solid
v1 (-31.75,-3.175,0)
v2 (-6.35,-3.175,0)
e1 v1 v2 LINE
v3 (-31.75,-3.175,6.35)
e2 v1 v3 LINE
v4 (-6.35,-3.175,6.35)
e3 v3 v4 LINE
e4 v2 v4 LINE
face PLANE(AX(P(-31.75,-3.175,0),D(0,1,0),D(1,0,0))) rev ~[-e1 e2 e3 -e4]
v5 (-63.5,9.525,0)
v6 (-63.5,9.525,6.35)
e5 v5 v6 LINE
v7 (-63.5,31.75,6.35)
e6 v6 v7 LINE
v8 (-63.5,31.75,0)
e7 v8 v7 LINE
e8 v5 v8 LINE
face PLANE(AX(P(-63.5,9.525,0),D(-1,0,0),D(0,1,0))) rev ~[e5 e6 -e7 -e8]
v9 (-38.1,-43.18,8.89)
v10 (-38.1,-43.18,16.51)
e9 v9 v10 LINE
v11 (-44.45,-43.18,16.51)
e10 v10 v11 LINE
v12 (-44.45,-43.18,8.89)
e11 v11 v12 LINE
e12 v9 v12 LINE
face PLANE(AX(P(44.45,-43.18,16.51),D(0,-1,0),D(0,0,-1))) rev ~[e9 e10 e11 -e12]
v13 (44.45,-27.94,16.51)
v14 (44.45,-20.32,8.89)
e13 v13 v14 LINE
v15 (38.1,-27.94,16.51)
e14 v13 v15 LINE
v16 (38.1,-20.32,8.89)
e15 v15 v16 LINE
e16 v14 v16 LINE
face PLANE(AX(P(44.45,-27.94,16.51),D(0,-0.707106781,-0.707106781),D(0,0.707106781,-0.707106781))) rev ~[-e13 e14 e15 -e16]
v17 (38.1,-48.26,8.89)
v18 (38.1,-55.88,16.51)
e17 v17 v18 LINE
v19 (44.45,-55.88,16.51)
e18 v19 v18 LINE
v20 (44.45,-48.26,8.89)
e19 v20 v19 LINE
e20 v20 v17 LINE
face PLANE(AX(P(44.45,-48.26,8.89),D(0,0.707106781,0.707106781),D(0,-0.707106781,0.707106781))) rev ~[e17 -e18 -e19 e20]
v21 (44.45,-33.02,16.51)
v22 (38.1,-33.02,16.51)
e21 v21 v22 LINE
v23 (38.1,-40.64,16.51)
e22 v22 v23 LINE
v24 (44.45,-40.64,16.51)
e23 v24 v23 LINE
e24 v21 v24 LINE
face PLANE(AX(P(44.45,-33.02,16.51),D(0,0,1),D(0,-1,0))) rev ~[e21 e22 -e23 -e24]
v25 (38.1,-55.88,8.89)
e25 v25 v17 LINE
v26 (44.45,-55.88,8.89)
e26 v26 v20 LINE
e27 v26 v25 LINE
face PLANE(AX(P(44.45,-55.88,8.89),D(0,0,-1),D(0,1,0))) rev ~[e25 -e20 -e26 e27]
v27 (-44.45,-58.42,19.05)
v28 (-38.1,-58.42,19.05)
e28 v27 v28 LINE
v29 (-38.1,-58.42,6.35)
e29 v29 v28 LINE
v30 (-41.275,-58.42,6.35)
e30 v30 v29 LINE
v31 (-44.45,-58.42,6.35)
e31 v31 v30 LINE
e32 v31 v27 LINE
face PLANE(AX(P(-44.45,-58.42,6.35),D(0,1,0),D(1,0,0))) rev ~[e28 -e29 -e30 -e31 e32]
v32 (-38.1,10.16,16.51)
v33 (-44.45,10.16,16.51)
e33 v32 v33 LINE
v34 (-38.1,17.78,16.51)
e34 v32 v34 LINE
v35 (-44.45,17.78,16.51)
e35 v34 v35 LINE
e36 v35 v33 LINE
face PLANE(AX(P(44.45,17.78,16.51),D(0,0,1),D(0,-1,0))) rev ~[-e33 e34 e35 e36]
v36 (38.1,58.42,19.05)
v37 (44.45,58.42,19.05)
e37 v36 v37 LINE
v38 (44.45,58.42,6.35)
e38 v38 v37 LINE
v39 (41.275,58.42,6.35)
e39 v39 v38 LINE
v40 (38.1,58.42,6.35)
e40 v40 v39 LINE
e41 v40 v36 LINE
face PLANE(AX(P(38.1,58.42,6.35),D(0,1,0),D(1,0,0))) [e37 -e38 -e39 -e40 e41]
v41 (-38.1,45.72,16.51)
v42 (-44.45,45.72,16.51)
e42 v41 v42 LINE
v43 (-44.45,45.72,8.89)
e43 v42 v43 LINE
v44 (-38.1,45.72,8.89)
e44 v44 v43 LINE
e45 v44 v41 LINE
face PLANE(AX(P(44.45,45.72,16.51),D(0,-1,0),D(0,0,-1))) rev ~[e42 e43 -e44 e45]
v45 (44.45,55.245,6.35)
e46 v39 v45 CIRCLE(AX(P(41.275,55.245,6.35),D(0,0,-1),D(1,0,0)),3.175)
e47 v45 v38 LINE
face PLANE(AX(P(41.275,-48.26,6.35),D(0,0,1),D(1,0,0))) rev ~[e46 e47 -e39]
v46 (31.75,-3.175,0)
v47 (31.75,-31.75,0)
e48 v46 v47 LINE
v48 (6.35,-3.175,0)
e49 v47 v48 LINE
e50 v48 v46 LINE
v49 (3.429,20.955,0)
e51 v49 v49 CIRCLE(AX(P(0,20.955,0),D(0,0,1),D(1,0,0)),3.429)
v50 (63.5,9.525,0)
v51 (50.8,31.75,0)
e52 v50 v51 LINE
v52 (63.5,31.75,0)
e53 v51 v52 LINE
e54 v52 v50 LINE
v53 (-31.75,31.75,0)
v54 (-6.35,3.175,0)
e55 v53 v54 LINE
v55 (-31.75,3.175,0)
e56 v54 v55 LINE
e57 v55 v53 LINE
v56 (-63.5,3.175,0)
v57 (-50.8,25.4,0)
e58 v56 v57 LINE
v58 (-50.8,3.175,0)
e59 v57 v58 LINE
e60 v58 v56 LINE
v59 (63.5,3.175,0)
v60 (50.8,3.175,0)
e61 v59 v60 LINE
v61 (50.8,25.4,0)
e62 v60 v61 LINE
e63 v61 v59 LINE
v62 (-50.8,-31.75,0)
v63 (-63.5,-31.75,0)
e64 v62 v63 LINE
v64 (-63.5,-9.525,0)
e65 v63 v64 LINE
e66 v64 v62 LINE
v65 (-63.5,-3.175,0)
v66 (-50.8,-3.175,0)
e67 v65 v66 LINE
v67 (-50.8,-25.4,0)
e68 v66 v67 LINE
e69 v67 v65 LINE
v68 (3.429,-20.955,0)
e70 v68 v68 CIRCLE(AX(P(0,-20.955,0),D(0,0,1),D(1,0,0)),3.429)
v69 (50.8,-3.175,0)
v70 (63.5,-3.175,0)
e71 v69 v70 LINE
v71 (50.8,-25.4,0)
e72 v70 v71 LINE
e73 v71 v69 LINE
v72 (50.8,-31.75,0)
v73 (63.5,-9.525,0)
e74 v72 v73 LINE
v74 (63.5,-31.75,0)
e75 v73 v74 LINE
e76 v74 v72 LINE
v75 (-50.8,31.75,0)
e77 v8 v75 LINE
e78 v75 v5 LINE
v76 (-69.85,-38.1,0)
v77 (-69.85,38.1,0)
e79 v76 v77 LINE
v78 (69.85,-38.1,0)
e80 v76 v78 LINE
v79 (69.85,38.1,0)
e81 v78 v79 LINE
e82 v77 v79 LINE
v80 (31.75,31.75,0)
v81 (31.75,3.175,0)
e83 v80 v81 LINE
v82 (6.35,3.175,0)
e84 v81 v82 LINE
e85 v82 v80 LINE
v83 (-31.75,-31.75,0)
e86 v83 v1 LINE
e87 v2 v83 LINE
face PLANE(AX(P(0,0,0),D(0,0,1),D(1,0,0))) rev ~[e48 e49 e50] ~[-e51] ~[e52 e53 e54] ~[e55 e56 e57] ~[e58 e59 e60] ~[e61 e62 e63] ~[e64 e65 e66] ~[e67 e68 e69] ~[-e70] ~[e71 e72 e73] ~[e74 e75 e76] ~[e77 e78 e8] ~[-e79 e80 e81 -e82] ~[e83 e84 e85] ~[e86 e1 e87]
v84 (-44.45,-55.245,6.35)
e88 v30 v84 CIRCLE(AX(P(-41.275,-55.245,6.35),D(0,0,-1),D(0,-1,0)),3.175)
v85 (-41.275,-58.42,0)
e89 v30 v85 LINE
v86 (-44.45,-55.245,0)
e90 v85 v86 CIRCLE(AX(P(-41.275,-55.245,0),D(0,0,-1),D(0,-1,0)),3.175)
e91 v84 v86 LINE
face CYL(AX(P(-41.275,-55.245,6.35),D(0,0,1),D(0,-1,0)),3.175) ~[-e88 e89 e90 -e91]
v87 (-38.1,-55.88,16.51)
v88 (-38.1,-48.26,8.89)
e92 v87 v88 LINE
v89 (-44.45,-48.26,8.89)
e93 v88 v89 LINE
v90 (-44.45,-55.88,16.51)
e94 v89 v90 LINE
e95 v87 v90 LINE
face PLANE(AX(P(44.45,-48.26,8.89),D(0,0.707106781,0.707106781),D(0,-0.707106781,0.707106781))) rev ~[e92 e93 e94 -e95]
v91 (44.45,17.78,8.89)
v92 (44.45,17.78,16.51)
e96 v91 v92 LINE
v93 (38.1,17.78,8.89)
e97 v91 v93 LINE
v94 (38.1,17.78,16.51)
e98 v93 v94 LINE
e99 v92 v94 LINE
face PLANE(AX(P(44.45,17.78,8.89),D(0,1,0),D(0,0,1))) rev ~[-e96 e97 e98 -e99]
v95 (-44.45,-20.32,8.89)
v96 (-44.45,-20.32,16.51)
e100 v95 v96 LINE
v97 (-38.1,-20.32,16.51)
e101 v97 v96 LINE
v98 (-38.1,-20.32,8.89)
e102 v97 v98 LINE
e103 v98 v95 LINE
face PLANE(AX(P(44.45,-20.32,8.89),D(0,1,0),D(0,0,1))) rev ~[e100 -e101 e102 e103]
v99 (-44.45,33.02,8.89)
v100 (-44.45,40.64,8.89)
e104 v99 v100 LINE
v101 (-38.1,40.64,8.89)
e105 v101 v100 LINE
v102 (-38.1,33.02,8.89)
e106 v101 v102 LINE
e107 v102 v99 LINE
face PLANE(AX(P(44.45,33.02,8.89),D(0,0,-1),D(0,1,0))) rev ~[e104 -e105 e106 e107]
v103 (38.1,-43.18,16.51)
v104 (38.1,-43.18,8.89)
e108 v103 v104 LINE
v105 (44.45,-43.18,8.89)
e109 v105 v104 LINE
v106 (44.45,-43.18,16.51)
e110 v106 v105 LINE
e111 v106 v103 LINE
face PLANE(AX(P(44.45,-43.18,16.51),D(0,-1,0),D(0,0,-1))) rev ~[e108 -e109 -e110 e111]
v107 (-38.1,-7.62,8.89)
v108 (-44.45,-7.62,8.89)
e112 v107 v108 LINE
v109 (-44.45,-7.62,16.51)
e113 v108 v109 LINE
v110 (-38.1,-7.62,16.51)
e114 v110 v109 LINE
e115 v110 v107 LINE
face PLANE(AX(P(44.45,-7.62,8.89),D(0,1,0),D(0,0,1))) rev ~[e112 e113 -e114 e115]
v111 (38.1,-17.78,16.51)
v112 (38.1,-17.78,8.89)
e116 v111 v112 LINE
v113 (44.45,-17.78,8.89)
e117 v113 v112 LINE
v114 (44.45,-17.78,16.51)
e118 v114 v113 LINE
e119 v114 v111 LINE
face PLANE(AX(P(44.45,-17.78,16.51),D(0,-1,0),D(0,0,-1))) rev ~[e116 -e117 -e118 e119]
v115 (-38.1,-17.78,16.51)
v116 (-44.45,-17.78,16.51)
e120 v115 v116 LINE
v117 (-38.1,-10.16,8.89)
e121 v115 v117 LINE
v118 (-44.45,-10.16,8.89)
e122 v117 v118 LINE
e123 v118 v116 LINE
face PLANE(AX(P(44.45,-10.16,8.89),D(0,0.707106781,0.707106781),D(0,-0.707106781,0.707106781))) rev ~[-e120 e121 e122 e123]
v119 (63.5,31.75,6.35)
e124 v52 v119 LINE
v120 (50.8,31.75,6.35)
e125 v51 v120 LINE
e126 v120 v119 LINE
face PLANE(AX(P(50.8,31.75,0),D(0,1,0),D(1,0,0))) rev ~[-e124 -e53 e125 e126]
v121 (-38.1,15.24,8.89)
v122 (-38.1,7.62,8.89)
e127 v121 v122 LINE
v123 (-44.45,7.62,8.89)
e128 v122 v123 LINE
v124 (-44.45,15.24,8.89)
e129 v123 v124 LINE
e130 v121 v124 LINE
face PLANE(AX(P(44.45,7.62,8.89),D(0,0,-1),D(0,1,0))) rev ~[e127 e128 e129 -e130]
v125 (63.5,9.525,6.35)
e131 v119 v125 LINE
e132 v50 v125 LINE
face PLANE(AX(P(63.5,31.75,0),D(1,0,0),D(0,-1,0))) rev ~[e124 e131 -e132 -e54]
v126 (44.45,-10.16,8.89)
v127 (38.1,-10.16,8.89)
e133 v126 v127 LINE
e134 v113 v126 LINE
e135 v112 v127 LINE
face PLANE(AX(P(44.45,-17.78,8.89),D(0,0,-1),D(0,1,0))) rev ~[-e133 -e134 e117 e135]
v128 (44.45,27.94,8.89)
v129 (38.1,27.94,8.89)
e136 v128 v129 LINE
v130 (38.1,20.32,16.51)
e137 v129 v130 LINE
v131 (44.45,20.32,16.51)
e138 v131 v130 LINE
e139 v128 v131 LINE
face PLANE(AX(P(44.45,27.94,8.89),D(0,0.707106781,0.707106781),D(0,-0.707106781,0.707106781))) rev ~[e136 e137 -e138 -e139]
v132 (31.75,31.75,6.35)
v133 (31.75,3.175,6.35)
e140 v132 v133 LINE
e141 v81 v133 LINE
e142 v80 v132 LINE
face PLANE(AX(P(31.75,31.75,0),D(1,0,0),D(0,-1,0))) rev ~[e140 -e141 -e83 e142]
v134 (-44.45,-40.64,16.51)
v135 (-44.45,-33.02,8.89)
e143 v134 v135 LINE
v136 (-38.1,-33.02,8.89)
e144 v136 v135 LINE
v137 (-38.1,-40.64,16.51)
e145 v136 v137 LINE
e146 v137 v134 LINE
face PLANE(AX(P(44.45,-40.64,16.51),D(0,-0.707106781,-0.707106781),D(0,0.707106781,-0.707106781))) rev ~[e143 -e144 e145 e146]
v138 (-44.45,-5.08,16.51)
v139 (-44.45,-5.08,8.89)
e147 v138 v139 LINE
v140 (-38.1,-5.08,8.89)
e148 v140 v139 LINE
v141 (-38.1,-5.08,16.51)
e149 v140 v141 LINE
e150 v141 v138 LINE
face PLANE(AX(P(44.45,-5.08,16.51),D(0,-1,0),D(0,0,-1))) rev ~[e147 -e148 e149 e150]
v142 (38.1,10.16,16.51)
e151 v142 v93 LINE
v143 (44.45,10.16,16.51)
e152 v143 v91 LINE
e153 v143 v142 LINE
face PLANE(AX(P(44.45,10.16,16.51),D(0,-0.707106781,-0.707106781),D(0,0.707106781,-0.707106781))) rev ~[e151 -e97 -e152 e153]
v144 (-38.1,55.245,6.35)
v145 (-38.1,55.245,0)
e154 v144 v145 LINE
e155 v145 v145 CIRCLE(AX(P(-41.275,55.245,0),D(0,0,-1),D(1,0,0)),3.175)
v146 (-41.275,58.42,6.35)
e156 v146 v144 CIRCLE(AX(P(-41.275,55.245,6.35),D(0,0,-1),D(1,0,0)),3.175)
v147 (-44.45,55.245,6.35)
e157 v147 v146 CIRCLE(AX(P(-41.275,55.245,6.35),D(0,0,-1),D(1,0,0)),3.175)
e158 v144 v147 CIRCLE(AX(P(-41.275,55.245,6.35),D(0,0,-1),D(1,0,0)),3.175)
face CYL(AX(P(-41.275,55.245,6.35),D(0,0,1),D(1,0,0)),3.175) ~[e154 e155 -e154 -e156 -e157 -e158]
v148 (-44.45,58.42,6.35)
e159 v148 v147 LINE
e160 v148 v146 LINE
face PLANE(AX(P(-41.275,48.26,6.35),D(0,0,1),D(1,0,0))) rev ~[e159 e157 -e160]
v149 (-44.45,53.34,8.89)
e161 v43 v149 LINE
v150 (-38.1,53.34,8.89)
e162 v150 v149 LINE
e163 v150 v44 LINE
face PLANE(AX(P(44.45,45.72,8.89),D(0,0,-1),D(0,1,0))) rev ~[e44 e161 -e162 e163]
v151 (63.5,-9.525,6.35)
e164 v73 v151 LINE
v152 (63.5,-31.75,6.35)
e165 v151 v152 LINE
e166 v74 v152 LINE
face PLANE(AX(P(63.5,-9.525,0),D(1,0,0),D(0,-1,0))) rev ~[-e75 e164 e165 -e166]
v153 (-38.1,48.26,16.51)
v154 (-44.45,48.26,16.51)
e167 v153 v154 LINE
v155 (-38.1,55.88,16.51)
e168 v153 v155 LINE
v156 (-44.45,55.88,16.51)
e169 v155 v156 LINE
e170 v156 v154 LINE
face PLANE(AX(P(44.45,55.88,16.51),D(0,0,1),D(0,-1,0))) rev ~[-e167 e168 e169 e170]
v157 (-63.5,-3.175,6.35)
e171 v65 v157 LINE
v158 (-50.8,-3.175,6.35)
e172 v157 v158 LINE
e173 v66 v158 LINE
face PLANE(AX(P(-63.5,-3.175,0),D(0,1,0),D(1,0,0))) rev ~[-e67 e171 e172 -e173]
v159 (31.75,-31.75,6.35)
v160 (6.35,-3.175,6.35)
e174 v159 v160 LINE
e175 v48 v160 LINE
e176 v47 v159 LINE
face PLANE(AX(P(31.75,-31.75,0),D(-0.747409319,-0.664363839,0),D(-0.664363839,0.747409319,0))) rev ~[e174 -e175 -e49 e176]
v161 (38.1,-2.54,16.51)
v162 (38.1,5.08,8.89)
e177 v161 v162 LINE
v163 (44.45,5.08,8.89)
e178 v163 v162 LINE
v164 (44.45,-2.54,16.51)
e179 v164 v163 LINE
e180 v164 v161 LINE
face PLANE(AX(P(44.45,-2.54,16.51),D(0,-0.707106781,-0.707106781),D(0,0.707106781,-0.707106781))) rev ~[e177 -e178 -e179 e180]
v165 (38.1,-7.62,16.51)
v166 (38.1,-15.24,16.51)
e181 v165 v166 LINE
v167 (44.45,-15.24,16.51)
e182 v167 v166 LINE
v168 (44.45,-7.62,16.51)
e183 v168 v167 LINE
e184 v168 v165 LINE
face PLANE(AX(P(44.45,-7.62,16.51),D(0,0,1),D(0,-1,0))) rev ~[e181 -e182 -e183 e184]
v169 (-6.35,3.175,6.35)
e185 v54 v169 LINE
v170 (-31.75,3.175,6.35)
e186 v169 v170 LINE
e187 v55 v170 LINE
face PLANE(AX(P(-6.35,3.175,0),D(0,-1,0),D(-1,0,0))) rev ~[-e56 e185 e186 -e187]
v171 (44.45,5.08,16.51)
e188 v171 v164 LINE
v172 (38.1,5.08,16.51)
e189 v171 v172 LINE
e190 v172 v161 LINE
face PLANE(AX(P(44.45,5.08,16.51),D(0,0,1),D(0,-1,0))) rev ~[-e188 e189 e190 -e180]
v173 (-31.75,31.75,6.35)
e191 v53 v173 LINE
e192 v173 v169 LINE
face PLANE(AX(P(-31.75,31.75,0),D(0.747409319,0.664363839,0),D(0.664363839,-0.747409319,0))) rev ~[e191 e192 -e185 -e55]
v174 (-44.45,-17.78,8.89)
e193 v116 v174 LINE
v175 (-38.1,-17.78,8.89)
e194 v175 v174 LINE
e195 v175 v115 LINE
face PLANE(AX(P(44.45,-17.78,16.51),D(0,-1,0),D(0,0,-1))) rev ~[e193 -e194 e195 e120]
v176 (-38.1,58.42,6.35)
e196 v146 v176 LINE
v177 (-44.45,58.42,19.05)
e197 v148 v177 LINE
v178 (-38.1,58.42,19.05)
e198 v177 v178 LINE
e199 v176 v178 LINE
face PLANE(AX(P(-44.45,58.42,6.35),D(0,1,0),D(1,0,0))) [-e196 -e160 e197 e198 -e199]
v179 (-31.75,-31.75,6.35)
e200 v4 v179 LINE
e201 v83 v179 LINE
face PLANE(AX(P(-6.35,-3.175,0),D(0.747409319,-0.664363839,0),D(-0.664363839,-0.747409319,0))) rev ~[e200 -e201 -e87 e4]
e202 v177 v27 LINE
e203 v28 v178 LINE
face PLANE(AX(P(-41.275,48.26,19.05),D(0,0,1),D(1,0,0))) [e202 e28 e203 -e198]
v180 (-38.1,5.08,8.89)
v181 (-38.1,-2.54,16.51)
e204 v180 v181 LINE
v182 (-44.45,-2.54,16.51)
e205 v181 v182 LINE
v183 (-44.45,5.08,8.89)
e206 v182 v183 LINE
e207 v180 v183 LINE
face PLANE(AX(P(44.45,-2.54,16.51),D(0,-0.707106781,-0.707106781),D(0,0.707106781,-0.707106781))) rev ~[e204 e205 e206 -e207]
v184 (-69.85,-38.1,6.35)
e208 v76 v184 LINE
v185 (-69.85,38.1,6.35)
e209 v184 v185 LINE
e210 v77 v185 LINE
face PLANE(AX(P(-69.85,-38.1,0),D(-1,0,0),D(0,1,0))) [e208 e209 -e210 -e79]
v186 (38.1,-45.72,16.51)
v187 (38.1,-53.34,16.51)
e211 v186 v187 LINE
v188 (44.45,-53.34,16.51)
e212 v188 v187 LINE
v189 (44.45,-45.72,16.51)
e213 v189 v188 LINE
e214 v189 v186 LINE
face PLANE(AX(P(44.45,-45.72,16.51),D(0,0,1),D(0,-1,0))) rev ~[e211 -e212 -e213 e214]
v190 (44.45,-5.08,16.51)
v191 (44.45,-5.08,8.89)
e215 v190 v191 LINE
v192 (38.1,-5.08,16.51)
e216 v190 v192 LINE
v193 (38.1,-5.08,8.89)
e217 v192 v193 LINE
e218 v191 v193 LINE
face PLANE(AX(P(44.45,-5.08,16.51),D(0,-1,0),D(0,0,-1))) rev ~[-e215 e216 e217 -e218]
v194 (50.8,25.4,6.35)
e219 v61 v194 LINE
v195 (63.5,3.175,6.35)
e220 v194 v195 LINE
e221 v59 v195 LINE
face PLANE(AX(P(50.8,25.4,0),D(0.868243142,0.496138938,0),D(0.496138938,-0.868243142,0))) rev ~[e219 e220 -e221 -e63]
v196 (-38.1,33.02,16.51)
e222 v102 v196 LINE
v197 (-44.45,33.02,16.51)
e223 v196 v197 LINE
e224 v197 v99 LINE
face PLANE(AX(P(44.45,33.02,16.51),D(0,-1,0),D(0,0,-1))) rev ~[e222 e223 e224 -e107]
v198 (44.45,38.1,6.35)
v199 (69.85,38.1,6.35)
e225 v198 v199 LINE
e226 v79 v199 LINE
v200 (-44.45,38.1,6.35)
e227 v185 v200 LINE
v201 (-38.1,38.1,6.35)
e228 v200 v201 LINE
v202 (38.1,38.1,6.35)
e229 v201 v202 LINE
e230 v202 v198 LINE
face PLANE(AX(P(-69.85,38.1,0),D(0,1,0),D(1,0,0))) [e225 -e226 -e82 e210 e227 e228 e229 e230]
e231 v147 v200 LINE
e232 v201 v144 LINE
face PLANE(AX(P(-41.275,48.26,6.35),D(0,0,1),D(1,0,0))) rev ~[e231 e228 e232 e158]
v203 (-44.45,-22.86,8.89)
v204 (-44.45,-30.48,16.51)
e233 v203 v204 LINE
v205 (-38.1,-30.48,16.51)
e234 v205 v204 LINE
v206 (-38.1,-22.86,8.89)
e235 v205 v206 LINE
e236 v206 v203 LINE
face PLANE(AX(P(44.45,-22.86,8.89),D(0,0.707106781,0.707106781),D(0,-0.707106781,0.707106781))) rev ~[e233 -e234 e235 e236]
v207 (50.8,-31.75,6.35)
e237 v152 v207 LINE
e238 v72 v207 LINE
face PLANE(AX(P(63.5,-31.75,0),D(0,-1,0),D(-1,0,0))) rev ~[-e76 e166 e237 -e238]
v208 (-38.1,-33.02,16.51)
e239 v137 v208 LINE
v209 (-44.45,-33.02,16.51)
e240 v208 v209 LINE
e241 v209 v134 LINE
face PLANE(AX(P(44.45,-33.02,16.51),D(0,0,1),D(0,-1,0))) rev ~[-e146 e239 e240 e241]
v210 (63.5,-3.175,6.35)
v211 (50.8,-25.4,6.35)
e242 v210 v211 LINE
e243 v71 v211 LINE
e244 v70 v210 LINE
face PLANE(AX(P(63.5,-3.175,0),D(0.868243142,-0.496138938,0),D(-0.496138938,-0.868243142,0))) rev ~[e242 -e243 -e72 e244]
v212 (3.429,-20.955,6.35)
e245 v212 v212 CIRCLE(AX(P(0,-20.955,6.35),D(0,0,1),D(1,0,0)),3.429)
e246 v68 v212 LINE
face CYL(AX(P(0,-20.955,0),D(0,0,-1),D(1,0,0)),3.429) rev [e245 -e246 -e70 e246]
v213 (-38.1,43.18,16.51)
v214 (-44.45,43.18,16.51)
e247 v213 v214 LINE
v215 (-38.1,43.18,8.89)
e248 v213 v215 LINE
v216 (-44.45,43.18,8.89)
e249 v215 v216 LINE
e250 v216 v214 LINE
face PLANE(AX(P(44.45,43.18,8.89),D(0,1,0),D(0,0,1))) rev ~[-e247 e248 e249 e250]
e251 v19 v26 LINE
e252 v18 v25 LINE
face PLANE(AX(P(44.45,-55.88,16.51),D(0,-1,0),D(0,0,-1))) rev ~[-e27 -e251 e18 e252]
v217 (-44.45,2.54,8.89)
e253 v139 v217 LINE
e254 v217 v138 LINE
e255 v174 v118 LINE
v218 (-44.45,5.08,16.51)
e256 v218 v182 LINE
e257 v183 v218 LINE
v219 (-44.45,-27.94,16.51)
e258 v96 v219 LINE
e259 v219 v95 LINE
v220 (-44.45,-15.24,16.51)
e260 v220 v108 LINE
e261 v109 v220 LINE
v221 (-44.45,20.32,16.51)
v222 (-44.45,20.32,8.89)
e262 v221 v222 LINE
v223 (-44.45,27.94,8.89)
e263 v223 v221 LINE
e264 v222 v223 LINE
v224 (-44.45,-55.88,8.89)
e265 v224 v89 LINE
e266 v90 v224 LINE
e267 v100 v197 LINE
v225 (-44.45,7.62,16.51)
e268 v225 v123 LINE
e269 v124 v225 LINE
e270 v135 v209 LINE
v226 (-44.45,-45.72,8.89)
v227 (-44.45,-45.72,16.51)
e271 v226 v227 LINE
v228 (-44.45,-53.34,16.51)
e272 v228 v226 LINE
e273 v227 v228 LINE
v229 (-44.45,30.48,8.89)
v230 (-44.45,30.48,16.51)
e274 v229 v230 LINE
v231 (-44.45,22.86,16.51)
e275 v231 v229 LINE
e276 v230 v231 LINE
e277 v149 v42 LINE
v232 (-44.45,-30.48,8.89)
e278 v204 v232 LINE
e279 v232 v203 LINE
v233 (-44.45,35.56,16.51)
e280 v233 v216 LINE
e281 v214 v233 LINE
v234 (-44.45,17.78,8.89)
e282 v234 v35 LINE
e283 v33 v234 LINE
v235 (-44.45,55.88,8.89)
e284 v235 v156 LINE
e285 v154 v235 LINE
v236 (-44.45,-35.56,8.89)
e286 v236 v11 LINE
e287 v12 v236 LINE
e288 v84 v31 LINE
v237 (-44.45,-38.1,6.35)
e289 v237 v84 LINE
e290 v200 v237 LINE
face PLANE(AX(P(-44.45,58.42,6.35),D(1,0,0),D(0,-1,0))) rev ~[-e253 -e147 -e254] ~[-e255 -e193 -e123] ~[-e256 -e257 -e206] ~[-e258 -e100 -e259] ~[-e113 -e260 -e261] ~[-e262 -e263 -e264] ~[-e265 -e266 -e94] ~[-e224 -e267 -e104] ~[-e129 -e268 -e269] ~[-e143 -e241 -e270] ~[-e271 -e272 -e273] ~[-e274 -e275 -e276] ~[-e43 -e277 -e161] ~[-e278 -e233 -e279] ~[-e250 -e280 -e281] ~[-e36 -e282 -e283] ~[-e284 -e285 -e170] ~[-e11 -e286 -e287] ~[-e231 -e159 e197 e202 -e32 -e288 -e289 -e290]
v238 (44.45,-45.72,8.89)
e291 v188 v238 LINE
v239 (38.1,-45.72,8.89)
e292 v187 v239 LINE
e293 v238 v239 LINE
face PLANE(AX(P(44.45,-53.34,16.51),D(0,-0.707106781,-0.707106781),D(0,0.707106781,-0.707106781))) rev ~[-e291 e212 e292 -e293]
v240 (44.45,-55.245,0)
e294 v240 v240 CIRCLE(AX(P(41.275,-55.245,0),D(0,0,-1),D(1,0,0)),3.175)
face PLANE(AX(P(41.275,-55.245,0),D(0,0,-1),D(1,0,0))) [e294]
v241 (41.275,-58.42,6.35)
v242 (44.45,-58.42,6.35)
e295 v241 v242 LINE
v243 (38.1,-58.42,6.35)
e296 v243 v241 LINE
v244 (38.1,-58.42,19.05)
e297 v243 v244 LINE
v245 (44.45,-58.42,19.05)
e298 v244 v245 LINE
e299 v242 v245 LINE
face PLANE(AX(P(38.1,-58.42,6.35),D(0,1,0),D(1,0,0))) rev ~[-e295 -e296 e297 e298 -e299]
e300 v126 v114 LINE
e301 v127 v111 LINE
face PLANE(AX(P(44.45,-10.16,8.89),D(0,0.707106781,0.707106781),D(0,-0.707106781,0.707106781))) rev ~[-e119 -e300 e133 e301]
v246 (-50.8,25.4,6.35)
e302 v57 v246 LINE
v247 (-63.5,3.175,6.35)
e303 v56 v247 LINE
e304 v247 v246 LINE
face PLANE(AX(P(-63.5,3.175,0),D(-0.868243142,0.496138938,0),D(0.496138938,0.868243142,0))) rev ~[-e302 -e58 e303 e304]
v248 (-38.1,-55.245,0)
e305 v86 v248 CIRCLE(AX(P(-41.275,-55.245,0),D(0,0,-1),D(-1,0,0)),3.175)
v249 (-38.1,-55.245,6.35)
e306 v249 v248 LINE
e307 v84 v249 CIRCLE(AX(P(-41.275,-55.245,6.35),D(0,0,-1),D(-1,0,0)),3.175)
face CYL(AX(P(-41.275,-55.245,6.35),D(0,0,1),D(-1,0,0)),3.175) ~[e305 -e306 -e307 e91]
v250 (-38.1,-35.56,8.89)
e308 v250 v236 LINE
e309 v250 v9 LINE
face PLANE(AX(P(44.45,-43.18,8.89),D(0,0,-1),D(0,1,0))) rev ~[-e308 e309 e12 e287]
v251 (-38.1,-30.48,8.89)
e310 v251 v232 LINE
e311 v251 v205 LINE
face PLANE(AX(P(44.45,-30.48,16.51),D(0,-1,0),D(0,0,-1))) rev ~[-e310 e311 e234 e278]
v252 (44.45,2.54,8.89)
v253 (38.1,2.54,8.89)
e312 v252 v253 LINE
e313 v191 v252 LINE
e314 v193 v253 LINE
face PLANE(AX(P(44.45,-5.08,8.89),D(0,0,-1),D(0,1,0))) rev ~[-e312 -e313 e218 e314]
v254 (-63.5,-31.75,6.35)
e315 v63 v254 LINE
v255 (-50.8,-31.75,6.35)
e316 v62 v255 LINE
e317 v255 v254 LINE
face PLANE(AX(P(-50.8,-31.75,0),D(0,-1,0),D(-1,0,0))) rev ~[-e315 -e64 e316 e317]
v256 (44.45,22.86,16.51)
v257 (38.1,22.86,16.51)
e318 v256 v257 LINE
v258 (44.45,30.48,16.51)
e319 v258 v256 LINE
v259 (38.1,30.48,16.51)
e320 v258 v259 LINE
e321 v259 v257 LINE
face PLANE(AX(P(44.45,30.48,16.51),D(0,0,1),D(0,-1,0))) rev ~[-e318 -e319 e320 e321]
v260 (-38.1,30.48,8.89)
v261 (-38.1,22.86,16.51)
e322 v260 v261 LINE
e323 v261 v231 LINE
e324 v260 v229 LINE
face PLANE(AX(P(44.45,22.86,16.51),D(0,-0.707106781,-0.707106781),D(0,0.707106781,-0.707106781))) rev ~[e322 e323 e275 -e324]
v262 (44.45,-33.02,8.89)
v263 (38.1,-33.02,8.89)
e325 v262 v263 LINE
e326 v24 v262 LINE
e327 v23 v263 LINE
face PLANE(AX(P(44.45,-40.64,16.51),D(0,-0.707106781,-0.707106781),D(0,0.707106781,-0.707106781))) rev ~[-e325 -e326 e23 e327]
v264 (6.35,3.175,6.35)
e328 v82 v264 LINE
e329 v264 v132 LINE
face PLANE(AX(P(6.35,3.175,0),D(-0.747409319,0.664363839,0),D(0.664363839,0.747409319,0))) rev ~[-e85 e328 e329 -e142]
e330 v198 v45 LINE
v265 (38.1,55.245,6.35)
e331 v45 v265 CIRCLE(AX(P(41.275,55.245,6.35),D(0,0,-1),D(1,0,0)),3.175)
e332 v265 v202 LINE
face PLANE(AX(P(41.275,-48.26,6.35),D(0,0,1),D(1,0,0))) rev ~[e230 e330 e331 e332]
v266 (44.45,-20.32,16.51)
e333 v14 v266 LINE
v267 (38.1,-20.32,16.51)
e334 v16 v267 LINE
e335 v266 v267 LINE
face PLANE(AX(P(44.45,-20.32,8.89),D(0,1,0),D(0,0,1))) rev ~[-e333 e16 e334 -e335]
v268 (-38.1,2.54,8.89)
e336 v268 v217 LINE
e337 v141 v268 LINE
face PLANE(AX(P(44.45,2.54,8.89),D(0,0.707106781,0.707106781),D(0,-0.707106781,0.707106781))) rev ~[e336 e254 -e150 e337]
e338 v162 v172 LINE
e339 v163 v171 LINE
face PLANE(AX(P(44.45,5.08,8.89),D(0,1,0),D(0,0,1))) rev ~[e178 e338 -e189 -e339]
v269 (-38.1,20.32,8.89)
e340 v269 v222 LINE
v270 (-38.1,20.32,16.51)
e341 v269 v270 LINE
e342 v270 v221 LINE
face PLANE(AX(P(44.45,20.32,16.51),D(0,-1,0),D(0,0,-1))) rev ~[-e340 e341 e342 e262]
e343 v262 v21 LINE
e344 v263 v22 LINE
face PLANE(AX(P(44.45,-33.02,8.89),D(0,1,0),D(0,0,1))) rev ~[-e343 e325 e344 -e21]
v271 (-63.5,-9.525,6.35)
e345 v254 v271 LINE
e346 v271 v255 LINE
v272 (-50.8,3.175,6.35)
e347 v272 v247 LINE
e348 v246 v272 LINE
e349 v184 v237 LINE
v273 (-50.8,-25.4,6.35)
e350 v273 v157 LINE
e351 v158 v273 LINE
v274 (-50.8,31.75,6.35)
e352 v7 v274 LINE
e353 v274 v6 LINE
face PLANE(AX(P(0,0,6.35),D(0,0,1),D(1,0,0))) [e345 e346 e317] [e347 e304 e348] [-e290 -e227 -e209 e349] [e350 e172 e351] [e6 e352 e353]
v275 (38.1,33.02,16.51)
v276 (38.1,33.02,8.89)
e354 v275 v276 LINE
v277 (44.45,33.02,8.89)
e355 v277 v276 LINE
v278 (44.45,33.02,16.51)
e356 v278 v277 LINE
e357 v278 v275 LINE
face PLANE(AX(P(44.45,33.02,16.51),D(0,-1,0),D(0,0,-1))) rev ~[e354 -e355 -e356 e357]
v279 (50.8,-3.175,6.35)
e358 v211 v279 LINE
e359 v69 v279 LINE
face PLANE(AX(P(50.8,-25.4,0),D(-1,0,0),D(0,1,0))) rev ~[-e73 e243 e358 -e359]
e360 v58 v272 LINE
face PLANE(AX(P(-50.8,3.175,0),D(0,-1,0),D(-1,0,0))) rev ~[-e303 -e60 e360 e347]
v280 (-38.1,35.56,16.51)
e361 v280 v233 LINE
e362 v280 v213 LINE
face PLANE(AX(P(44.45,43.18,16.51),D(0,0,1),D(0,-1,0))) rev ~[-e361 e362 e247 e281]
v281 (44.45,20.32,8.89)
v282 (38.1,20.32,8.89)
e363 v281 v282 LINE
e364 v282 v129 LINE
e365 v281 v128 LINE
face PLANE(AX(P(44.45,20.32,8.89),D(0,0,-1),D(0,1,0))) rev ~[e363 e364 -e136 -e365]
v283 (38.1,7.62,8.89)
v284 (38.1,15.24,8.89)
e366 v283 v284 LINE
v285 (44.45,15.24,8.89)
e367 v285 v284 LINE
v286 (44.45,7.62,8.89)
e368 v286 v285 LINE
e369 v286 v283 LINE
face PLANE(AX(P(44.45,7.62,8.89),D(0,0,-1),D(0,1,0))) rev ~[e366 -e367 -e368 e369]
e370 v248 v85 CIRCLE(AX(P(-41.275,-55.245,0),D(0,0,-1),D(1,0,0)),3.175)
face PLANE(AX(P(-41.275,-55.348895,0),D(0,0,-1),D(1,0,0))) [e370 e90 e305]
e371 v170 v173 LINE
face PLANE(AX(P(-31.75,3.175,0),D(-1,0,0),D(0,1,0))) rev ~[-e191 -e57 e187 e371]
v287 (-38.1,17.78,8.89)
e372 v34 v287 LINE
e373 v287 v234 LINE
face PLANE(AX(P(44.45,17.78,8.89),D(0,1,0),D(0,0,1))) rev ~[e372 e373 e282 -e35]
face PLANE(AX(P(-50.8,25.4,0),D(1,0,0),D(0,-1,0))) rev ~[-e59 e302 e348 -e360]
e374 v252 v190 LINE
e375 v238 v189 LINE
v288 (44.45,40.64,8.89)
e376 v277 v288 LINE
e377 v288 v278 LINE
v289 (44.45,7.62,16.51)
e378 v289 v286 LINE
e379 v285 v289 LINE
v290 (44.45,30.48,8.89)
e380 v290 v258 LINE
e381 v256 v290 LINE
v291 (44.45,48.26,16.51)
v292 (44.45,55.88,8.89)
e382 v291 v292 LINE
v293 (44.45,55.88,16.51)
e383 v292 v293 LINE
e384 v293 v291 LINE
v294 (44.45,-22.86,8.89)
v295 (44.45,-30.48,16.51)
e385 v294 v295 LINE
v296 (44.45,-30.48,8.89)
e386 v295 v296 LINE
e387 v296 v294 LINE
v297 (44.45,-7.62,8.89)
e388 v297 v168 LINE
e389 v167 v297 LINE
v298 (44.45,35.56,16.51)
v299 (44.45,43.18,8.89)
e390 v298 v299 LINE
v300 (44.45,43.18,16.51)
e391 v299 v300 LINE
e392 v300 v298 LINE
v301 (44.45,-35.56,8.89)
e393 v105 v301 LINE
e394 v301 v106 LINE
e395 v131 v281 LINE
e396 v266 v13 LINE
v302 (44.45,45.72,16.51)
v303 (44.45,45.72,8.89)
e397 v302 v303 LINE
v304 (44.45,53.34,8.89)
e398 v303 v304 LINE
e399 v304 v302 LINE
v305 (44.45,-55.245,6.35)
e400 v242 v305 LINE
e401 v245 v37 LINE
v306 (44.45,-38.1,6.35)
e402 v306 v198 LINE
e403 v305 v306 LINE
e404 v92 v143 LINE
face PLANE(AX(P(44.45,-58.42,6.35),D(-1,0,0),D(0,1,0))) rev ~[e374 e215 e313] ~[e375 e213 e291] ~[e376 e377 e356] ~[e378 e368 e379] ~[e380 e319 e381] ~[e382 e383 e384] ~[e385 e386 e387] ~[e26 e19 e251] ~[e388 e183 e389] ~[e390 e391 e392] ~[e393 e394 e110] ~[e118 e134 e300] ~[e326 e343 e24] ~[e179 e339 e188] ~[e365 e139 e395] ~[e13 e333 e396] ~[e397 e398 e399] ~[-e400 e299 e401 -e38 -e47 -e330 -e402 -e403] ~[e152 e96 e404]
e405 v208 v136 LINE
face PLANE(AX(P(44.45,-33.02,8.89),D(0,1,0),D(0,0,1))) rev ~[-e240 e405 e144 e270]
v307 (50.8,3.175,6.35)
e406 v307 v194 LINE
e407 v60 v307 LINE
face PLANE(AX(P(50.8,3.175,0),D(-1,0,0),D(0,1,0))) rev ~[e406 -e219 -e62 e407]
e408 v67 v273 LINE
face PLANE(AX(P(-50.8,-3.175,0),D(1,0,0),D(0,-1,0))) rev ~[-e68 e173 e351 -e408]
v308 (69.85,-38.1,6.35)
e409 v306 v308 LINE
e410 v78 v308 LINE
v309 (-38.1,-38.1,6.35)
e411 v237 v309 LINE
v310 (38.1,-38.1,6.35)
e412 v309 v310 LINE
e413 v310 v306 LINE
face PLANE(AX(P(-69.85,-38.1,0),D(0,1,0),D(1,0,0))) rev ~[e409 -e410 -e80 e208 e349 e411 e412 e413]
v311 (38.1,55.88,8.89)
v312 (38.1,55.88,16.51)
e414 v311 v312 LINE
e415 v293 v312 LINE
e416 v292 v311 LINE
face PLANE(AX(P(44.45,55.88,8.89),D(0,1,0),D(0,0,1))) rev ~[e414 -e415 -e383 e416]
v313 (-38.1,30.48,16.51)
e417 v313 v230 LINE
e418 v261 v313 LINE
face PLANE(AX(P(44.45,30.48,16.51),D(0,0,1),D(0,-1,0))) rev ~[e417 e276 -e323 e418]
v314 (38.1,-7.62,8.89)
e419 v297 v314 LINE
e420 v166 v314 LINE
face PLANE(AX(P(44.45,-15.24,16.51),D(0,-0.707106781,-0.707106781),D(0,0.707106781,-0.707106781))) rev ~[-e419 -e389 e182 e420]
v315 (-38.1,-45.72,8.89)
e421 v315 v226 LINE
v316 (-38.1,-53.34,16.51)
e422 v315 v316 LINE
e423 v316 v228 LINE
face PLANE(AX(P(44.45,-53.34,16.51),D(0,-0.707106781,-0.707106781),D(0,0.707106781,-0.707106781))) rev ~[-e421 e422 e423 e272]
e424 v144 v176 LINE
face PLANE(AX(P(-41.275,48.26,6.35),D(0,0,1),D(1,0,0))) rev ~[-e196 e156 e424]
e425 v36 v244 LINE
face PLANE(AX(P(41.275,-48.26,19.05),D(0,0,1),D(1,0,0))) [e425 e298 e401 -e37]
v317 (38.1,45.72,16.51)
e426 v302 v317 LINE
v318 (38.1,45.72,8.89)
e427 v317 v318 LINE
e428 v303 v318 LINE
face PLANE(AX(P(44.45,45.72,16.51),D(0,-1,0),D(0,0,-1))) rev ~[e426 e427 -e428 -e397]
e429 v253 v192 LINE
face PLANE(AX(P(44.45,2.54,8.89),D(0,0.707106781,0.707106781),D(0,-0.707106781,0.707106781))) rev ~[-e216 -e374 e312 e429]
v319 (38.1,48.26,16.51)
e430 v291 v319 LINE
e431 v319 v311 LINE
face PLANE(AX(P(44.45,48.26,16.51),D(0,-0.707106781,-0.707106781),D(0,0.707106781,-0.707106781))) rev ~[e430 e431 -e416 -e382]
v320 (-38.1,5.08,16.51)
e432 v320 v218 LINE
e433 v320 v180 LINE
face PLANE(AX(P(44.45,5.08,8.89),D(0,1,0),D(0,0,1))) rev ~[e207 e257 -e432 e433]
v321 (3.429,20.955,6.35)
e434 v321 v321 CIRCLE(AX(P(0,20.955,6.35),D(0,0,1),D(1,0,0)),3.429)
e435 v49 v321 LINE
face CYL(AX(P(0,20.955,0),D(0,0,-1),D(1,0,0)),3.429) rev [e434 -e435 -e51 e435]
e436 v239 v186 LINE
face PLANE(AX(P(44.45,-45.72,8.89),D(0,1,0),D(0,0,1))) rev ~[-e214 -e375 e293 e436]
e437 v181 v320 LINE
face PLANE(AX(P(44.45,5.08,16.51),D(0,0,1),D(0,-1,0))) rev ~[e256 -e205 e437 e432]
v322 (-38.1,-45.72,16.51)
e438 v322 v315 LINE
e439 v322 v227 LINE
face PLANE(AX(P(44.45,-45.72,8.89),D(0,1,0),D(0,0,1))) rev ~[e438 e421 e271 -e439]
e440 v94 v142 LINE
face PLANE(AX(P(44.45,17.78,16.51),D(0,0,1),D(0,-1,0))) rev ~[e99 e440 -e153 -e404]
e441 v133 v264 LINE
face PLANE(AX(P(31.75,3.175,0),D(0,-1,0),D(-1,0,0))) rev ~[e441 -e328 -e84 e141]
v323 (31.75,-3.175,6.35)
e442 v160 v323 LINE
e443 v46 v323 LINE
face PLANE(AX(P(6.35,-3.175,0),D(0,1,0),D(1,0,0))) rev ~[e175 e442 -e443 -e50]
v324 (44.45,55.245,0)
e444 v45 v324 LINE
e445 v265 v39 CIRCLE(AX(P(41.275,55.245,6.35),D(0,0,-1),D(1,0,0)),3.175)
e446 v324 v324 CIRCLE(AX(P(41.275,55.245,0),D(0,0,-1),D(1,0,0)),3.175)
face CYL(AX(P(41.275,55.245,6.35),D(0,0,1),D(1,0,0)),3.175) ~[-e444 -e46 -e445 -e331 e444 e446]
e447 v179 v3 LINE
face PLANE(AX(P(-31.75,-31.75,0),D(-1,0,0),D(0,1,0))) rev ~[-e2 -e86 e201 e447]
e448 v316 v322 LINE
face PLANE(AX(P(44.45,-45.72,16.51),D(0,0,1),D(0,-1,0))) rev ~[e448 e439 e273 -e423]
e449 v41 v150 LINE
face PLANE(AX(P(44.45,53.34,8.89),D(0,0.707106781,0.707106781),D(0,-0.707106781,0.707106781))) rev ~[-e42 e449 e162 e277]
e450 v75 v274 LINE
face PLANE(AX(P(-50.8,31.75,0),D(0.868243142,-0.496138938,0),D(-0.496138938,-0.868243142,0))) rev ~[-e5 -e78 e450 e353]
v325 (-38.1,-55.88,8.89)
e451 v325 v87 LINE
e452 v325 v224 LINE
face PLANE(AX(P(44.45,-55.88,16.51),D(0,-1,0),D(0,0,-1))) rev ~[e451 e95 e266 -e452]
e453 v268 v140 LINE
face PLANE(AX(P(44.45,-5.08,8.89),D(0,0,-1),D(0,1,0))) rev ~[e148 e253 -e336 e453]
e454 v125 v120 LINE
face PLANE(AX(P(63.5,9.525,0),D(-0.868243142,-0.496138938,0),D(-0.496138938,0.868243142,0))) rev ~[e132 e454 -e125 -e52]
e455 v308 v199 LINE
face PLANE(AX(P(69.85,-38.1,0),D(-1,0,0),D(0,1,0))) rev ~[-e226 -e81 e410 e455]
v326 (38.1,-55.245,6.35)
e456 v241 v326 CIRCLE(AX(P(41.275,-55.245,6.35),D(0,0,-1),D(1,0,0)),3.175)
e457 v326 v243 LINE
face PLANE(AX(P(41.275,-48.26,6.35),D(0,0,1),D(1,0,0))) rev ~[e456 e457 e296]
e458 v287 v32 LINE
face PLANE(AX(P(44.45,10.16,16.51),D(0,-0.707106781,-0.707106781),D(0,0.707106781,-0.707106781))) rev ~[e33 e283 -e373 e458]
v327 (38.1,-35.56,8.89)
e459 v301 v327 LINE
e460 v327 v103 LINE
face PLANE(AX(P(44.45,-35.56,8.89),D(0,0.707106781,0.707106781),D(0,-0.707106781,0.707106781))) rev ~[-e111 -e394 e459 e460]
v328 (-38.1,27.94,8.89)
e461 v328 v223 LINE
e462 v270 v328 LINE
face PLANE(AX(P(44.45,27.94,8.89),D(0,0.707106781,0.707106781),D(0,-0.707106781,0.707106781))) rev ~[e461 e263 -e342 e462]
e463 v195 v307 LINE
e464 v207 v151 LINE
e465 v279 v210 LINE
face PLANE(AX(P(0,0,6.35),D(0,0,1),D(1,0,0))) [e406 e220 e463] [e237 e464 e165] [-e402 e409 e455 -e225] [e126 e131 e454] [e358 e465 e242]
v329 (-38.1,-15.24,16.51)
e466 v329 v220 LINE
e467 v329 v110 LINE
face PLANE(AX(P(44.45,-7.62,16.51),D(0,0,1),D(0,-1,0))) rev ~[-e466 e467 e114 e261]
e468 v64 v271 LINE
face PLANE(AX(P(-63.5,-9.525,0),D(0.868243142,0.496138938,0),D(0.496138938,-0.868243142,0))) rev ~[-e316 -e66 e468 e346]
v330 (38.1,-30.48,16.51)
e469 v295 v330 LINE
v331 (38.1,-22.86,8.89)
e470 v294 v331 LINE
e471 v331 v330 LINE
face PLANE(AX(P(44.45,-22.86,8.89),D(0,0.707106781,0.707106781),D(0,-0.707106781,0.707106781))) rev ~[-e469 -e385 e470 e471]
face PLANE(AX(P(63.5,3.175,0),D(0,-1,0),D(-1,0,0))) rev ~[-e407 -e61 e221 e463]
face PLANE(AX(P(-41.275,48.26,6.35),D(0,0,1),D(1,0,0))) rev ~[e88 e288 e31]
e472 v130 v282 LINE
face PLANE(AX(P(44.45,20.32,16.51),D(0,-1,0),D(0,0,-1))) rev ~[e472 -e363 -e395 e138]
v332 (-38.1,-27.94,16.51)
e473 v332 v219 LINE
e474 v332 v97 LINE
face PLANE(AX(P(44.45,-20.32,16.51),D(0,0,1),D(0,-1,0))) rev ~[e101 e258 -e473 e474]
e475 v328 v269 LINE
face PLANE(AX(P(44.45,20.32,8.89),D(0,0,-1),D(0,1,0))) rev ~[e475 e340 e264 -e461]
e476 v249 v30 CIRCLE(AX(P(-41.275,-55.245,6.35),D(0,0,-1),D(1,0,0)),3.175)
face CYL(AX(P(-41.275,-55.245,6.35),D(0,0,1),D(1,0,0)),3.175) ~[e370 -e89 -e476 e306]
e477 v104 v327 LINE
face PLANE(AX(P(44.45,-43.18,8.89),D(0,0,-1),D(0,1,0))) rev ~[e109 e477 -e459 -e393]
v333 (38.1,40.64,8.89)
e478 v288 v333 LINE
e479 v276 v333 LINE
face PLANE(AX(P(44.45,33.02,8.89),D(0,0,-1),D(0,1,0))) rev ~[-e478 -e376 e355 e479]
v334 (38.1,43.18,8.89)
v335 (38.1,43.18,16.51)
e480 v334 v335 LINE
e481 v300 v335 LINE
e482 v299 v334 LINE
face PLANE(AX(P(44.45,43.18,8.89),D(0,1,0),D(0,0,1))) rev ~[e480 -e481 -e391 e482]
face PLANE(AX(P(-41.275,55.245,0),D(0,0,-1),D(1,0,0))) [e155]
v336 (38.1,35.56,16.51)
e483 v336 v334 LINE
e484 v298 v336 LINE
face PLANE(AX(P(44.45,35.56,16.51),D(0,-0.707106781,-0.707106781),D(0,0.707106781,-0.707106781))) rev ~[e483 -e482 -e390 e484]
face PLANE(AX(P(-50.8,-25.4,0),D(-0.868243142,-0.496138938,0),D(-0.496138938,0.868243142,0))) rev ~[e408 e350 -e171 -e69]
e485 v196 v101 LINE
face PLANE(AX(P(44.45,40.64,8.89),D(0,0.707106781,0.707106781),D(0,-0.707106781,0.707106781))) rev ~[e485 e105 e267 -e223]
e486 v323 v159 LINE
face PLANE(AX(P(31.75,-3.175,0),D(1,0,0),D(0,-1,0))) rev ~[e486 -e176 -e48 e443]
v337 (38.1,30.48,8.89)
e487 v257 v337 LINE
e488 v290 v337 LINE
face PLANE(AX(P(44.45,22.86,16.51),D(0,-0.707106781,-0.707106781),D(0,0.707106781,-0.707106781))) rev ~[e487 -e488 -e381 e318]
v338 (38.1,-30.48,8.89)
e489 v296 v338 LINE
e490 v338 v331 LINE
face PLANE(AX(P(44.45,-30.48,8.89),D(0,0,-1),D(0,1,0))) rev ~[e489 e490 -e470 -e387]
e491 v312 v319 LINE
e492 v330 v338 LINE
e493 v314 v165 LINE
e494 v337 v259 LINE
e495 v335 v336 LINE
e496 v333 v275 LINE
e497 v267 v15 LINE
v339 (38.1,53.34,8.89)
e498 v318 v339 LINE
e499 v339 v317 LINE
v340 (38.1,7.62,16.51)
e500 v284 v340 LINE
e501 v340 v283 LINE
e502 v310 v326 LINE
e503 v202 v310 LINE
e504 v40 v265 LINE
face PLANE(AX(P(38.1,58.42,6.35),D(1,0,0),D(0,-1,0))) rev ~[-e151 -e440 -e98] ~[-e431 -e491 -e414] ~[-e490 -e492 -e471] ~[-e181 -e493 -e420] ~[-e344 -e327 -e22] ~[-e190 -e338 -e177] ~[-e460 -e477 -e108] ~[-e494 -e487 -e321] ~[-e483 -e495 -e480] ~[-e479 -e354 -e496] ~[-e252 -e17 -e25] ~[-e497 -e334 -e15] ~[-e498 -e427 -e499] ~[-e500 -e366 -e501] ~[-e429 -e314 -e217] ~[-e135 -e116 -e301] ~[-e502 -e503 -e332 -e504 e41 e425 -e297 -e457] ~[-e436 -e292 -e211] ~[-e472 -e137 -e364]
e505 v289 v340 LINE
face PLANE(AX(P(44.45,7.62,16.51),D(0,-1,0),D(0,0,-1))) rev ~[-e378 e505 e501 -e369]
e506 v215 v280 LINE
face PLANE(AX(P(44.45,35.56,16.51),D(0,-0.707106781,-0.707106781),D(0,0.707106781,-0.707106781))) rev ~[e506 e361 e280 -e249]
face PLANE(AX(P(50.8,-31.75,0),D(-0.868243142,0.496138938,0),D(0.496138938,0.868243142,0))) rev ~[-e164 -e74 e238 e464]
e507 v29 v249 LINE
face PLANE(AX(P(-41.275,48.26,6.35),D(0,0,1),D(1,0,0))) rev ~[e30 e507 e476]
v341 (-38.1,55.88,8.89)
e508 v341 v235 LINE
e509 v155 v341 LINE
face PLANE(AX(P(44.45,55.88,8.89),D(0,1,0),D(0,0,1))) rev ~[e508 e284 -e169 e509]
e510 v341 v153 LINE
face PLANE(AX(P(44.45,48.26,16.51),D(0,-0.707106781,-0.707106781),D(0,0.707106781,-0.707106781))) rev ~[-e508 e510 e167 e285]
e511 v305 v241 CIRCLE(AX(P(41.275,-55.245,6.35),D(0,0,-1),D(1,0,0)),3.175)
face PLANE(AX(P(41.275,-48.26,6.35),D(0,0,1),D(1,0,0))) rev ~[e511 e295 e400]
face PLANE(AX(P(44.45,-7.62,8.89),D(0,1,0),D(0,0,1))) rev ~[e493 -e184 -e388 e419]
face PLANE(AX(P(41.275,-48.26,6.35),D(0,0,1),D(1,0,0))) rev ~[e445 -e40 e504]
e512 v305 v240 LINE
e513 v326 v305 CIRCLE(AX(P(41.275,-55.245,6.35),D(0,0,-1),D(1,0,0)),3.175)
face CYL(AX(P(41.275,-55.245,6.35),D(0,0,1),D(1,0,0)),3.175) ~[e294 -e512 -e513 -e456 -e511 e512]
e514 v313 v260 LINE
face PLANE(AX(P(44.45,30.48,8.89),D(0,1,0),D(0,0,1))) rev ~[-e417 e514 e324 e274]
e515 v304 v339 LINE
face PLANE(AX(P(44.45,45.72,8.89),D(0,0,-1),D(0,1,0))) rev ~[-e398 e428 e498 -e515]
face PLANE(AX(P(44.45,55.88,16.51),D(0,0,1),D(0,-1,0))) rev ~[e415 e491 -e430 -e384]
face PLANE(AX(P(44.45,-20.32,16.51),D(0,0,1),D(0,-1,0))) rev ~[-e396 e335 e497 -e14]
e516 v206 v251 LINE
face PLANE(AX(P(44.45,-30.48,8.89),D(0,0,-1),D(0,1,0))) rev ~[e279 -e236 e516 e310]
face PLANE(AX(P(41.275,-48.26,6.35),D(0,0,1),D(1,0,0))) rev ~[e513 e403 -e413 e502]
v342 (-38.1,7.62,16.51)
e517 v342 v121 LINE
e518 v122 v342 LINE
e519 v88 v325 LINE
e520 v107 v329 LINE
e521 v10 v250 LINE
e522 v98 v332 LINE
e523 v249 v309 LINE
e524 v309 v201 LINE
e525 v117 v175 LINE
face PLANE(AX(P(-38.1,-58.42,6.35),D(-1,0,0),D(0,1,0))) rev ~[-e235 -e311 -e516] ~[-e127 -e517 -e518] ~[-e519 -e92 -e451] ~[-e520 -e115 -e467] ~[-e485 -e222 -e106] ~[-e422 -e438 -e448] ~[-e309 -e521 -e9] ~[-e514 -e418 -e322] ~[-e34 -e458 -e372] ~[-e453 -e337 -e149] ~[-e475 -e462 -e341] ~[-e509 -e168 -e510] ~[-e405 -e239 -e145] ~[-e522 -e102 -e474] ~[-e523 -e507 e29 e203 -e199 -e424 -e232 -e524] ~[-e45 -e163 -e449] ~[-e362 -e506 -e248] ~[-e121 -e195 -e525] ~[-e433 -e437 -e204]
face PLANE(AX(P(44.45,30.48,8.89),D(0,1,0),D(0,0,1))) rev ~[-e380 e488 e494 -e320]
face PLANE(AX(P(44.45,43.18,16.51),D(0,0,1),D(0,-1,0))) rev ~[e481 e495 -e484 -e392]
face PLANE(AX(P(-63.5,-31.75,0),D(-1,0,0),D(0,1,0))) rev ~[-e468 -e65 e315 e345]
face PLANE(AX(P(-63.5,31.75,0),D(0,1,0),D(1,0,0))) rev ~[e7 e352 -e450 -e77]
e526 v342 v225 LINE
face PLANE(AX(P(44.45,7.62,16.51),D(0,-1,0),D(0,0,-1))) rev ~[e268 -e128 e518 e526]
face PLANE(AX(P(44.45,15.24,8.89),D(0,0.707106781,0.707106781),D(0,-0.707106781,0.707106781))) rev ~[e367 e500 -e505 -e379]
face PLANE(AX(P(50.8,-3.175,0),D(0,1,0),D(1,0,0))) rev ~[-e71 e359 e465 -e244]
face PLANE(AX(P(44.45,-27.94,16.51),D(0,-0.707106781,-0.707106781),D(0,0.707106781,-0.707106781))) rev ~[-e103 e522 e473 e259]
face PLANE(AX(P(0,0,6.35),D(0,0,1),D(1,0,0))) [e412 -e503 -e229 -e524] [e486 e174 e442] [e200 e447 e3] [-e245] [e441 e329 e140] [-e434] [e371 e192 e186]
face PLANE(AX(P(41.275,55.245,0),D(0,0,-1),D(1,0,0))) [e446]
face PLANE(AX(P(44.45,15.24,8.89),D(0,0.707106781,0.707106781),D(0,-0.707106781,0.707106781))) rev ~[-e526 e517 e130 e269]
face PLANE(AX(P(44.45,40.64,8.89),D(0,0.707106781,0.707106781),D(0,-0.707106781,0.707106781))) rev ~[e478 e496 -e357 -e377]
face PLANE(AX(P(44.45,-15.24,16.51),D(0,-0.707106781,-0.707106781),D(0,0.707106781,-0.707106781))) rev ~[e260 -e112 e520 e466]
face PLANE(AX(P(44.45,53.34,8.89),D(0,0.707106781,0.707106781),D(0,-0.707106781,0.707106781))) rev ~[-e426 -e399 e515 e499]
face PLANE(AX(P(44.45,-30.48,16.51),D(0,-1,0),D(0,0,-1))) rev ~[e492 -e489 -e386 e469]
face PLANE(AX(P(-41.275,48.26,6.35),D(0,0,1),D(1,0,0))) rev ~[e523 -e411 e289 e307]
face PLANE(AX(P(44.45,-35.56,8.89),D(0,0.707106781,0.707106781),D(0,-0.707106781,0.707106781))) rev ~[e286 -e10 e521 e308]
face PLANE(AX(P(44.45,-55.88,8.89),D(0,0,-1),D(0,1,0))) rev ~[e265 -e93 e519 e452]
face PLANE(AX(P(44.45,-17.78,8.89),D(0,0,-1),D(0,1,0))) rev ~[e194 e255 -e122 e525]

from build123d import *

# Parameters (mm, degrees)
F0_W     = 139.7
F0_H     = 76.2
F0_R     = 3.429
F1_DEPTH = 6.35
F2_W     = 6.35
F2_H     = 20.32
F2_H_2   = 76.2
F3_DEPTH = 12.7
F5_DEPTH = 114.301
F6_R     = 3.175
F7_DEPTH = 6.35


# Not quite as in the source:
# - a feature names something its author has since deleted; it is built from what else it names


with BuildPart() as f1:
    # F0 (on Top) → F1 (new body)
    with BuildSketch(Plane.XY):
        Rectangle(F0_W, F0_H)
        Polygon((-63.5, -9.525), (-50.8, -31.75), (-63.5, -31.75), align=None, mode=Mode.SUBTRACT)
        Polygon((-50.8, -25.4), (-63.5, -3.175), (-50.8, -3.175), align=None, mode=Mode.SUBTRACT)
        Polygon((-31.75, -31.75), (-31.75, -3.175), (-6.35, -3.175), align=None, mode=Mode.SUBTRACT)
        with Locations((0, -20.955)):
            Circle(F0_R, mode=Mode.SUBTRACT)
        Polygon((50.8, -31.75), (63.5, -9.525), (63.5, -31.75), align=None, mode=Mode.SUBTRACT)
        Polygon((31.75, -31.75), (6.35, -3.175), (31.75, -3.175), align=None, mode=Mode.SUBTRACT)
        Polygon((63.5, -3.175), (50.8, -25.4), (50.8, -3.175), align=None, mode=Mode.SUBTRACT)
        Polygon((-50.8, 25.4), (-50.8, 3.175), (-63.5, 3.175), align=None, mode=Mode.SUBTRACT)
        Polygon((-6.35, 3.175), (-31.75, 3.175), (-31.75, 31.75), align=None, mode=Mode.SUBTRACT)
        Polygon((-50.8, 31.75), (-63.5, 9.525), (-63.5, 31.75), align=None, mode=Mode.SUBTRACT)
        Polygon((6.35, 3.175), (31.75, 31.75), (31.75, 3.175), align=None, mode=Mode.SUBTRACT)
        Polygon((63.5, 3.175), (50.8, 3.175), (50.8, 25.4), align=None, mode=Mode.SUBTRACT)
        with Locations((0, 20.955)):
            Circle(F0_R, mode=Mode.SUBTRACT)
        Polygon((63.5, 9.525), (50.8, 31.75), (63.5, 31.75), align=None, mode=Mode.SUBTRACT)
    extrude(amount=F1_DEPTH)

    # F2 (on face) → F3 (join)
    with BuildSketch(Plane.XY.offset(6.35)):
        with Locations((41.275, -48.26)):
            Rectangle(F2_W, F2_H)
        with Locations((41.275, 0)):
            Rectangle(F2_W, F2_H_2)
        with Locations((41.275, 48.26)):
            Rectangle(F2_W, F2_H)
        with Locations((-41.275, 48.26)):
            Rectangle(F2_W, F2_H)
        with Locations((-41.275, 0)):
            Rectangle(F2_W, F2_H_2)
        with Locations((-41.275, -48.26)):
            Rectangle(F2_W, F2_H)
    extrude(amount=F3_DEPTH)

    # F4 (on face) → F5 (cut, through all)
    with BuildSketch(Plane.YZ.offset(44.45)):
        Polygon((-48.26, 8.89), (-55.88, 16.51), (-55.88, 8.89), align=None)
        Polygon((-45.72, 16.51), (-53.34, 16.51), (-45.72, 8.89), align=None)
        Polygon((-40.64, 16.51), (-33.02, 8.89), (-33.02, 16.51), align=None)
        Polygon((-43.18, 8.89), (-35.56, 8.89), (-43.18, 16.51), align=None)
        Polygon((-27.94, 16.51), (-20.32, 8.89), (-20.32, 16.51), align=None)
        Polygon((-30.48, 8.89), (-22.86, 8.89), (-30.48, 16.51), align=None)
        Polygon((-15.24, 16.51), (-7.62, 8.89), (-7.62, 16.51), align=None)
        Polygon((-17.78, 8.89), (-10.16, 8.89), (-17.78, 16.51), align=None)
        Polygon((-2.54, 16.51), (5.08, 8.89), (5.08, 16.51), align=None)
        Polygon((-5.08, 8.89), (2.54, 8.89), (-5.08, 16.51), align=None)
        Polygon((10.16, 16.51), (17.78, 8.89), (17.78, 16.51), align=None)
        Polygon((7.62, 8.89), (15.24, 8.89), (7.62, 16.51), align=None)
        Polygon((22.86, 16.51), (30.48, 8.89), (30.48, 16.51), align=None)
        Polygon((20.32, 8.89), (27.94, 8.89), (20.32, 16.51), align=None)
        Polygon((35.56, 16.51), (43.18, 8.89), (43.18, 16.51), align=None)
        Polygon((33.02, 8.89), (40.64, 8.89), (33.02, 16.51), align=None)
        Polygon((48.26, 16.51), (55.88, 8.89), (55.88, 16.51), align=None)
        Polygon((45.72, 8.89), (53.34, 8.89), (45.72, 16.51), align=None)
    extrude(amount=-F5_DEPTH, mode=Mode.SUBTRACT)

    # F6 (on face) → F7 (join)
    with BuildSketch(Plane(origin=(0, 0, 6.35), x_dir=(1, 0, 0), z_dir=(0, 0, -1))):
        with BuildLine():
            ThreePointArc((-44.45, 55.245), (-41.275, 52.07), (-38.1, 55.245))
            ThreePointArc((-38.1, 55.245), (-39.0299359697, 57.4900640303), (-41.275, 58.42))
            ThreePointArc((-41.275, 58.42), (-43.5200640303, 57.4900640303), (-44.45, 55.245))
        make_face()
        with Locations((41.275, 55.245)):
            Circle(F6_R)
        with Locations((-41.275, -55.245)):
            Circle(F6_R)
        with Locations((41.275, -55.245)):
            Circle(F6_R)
    extrude(amount=F7_DEPTH)


solid = f1.part
